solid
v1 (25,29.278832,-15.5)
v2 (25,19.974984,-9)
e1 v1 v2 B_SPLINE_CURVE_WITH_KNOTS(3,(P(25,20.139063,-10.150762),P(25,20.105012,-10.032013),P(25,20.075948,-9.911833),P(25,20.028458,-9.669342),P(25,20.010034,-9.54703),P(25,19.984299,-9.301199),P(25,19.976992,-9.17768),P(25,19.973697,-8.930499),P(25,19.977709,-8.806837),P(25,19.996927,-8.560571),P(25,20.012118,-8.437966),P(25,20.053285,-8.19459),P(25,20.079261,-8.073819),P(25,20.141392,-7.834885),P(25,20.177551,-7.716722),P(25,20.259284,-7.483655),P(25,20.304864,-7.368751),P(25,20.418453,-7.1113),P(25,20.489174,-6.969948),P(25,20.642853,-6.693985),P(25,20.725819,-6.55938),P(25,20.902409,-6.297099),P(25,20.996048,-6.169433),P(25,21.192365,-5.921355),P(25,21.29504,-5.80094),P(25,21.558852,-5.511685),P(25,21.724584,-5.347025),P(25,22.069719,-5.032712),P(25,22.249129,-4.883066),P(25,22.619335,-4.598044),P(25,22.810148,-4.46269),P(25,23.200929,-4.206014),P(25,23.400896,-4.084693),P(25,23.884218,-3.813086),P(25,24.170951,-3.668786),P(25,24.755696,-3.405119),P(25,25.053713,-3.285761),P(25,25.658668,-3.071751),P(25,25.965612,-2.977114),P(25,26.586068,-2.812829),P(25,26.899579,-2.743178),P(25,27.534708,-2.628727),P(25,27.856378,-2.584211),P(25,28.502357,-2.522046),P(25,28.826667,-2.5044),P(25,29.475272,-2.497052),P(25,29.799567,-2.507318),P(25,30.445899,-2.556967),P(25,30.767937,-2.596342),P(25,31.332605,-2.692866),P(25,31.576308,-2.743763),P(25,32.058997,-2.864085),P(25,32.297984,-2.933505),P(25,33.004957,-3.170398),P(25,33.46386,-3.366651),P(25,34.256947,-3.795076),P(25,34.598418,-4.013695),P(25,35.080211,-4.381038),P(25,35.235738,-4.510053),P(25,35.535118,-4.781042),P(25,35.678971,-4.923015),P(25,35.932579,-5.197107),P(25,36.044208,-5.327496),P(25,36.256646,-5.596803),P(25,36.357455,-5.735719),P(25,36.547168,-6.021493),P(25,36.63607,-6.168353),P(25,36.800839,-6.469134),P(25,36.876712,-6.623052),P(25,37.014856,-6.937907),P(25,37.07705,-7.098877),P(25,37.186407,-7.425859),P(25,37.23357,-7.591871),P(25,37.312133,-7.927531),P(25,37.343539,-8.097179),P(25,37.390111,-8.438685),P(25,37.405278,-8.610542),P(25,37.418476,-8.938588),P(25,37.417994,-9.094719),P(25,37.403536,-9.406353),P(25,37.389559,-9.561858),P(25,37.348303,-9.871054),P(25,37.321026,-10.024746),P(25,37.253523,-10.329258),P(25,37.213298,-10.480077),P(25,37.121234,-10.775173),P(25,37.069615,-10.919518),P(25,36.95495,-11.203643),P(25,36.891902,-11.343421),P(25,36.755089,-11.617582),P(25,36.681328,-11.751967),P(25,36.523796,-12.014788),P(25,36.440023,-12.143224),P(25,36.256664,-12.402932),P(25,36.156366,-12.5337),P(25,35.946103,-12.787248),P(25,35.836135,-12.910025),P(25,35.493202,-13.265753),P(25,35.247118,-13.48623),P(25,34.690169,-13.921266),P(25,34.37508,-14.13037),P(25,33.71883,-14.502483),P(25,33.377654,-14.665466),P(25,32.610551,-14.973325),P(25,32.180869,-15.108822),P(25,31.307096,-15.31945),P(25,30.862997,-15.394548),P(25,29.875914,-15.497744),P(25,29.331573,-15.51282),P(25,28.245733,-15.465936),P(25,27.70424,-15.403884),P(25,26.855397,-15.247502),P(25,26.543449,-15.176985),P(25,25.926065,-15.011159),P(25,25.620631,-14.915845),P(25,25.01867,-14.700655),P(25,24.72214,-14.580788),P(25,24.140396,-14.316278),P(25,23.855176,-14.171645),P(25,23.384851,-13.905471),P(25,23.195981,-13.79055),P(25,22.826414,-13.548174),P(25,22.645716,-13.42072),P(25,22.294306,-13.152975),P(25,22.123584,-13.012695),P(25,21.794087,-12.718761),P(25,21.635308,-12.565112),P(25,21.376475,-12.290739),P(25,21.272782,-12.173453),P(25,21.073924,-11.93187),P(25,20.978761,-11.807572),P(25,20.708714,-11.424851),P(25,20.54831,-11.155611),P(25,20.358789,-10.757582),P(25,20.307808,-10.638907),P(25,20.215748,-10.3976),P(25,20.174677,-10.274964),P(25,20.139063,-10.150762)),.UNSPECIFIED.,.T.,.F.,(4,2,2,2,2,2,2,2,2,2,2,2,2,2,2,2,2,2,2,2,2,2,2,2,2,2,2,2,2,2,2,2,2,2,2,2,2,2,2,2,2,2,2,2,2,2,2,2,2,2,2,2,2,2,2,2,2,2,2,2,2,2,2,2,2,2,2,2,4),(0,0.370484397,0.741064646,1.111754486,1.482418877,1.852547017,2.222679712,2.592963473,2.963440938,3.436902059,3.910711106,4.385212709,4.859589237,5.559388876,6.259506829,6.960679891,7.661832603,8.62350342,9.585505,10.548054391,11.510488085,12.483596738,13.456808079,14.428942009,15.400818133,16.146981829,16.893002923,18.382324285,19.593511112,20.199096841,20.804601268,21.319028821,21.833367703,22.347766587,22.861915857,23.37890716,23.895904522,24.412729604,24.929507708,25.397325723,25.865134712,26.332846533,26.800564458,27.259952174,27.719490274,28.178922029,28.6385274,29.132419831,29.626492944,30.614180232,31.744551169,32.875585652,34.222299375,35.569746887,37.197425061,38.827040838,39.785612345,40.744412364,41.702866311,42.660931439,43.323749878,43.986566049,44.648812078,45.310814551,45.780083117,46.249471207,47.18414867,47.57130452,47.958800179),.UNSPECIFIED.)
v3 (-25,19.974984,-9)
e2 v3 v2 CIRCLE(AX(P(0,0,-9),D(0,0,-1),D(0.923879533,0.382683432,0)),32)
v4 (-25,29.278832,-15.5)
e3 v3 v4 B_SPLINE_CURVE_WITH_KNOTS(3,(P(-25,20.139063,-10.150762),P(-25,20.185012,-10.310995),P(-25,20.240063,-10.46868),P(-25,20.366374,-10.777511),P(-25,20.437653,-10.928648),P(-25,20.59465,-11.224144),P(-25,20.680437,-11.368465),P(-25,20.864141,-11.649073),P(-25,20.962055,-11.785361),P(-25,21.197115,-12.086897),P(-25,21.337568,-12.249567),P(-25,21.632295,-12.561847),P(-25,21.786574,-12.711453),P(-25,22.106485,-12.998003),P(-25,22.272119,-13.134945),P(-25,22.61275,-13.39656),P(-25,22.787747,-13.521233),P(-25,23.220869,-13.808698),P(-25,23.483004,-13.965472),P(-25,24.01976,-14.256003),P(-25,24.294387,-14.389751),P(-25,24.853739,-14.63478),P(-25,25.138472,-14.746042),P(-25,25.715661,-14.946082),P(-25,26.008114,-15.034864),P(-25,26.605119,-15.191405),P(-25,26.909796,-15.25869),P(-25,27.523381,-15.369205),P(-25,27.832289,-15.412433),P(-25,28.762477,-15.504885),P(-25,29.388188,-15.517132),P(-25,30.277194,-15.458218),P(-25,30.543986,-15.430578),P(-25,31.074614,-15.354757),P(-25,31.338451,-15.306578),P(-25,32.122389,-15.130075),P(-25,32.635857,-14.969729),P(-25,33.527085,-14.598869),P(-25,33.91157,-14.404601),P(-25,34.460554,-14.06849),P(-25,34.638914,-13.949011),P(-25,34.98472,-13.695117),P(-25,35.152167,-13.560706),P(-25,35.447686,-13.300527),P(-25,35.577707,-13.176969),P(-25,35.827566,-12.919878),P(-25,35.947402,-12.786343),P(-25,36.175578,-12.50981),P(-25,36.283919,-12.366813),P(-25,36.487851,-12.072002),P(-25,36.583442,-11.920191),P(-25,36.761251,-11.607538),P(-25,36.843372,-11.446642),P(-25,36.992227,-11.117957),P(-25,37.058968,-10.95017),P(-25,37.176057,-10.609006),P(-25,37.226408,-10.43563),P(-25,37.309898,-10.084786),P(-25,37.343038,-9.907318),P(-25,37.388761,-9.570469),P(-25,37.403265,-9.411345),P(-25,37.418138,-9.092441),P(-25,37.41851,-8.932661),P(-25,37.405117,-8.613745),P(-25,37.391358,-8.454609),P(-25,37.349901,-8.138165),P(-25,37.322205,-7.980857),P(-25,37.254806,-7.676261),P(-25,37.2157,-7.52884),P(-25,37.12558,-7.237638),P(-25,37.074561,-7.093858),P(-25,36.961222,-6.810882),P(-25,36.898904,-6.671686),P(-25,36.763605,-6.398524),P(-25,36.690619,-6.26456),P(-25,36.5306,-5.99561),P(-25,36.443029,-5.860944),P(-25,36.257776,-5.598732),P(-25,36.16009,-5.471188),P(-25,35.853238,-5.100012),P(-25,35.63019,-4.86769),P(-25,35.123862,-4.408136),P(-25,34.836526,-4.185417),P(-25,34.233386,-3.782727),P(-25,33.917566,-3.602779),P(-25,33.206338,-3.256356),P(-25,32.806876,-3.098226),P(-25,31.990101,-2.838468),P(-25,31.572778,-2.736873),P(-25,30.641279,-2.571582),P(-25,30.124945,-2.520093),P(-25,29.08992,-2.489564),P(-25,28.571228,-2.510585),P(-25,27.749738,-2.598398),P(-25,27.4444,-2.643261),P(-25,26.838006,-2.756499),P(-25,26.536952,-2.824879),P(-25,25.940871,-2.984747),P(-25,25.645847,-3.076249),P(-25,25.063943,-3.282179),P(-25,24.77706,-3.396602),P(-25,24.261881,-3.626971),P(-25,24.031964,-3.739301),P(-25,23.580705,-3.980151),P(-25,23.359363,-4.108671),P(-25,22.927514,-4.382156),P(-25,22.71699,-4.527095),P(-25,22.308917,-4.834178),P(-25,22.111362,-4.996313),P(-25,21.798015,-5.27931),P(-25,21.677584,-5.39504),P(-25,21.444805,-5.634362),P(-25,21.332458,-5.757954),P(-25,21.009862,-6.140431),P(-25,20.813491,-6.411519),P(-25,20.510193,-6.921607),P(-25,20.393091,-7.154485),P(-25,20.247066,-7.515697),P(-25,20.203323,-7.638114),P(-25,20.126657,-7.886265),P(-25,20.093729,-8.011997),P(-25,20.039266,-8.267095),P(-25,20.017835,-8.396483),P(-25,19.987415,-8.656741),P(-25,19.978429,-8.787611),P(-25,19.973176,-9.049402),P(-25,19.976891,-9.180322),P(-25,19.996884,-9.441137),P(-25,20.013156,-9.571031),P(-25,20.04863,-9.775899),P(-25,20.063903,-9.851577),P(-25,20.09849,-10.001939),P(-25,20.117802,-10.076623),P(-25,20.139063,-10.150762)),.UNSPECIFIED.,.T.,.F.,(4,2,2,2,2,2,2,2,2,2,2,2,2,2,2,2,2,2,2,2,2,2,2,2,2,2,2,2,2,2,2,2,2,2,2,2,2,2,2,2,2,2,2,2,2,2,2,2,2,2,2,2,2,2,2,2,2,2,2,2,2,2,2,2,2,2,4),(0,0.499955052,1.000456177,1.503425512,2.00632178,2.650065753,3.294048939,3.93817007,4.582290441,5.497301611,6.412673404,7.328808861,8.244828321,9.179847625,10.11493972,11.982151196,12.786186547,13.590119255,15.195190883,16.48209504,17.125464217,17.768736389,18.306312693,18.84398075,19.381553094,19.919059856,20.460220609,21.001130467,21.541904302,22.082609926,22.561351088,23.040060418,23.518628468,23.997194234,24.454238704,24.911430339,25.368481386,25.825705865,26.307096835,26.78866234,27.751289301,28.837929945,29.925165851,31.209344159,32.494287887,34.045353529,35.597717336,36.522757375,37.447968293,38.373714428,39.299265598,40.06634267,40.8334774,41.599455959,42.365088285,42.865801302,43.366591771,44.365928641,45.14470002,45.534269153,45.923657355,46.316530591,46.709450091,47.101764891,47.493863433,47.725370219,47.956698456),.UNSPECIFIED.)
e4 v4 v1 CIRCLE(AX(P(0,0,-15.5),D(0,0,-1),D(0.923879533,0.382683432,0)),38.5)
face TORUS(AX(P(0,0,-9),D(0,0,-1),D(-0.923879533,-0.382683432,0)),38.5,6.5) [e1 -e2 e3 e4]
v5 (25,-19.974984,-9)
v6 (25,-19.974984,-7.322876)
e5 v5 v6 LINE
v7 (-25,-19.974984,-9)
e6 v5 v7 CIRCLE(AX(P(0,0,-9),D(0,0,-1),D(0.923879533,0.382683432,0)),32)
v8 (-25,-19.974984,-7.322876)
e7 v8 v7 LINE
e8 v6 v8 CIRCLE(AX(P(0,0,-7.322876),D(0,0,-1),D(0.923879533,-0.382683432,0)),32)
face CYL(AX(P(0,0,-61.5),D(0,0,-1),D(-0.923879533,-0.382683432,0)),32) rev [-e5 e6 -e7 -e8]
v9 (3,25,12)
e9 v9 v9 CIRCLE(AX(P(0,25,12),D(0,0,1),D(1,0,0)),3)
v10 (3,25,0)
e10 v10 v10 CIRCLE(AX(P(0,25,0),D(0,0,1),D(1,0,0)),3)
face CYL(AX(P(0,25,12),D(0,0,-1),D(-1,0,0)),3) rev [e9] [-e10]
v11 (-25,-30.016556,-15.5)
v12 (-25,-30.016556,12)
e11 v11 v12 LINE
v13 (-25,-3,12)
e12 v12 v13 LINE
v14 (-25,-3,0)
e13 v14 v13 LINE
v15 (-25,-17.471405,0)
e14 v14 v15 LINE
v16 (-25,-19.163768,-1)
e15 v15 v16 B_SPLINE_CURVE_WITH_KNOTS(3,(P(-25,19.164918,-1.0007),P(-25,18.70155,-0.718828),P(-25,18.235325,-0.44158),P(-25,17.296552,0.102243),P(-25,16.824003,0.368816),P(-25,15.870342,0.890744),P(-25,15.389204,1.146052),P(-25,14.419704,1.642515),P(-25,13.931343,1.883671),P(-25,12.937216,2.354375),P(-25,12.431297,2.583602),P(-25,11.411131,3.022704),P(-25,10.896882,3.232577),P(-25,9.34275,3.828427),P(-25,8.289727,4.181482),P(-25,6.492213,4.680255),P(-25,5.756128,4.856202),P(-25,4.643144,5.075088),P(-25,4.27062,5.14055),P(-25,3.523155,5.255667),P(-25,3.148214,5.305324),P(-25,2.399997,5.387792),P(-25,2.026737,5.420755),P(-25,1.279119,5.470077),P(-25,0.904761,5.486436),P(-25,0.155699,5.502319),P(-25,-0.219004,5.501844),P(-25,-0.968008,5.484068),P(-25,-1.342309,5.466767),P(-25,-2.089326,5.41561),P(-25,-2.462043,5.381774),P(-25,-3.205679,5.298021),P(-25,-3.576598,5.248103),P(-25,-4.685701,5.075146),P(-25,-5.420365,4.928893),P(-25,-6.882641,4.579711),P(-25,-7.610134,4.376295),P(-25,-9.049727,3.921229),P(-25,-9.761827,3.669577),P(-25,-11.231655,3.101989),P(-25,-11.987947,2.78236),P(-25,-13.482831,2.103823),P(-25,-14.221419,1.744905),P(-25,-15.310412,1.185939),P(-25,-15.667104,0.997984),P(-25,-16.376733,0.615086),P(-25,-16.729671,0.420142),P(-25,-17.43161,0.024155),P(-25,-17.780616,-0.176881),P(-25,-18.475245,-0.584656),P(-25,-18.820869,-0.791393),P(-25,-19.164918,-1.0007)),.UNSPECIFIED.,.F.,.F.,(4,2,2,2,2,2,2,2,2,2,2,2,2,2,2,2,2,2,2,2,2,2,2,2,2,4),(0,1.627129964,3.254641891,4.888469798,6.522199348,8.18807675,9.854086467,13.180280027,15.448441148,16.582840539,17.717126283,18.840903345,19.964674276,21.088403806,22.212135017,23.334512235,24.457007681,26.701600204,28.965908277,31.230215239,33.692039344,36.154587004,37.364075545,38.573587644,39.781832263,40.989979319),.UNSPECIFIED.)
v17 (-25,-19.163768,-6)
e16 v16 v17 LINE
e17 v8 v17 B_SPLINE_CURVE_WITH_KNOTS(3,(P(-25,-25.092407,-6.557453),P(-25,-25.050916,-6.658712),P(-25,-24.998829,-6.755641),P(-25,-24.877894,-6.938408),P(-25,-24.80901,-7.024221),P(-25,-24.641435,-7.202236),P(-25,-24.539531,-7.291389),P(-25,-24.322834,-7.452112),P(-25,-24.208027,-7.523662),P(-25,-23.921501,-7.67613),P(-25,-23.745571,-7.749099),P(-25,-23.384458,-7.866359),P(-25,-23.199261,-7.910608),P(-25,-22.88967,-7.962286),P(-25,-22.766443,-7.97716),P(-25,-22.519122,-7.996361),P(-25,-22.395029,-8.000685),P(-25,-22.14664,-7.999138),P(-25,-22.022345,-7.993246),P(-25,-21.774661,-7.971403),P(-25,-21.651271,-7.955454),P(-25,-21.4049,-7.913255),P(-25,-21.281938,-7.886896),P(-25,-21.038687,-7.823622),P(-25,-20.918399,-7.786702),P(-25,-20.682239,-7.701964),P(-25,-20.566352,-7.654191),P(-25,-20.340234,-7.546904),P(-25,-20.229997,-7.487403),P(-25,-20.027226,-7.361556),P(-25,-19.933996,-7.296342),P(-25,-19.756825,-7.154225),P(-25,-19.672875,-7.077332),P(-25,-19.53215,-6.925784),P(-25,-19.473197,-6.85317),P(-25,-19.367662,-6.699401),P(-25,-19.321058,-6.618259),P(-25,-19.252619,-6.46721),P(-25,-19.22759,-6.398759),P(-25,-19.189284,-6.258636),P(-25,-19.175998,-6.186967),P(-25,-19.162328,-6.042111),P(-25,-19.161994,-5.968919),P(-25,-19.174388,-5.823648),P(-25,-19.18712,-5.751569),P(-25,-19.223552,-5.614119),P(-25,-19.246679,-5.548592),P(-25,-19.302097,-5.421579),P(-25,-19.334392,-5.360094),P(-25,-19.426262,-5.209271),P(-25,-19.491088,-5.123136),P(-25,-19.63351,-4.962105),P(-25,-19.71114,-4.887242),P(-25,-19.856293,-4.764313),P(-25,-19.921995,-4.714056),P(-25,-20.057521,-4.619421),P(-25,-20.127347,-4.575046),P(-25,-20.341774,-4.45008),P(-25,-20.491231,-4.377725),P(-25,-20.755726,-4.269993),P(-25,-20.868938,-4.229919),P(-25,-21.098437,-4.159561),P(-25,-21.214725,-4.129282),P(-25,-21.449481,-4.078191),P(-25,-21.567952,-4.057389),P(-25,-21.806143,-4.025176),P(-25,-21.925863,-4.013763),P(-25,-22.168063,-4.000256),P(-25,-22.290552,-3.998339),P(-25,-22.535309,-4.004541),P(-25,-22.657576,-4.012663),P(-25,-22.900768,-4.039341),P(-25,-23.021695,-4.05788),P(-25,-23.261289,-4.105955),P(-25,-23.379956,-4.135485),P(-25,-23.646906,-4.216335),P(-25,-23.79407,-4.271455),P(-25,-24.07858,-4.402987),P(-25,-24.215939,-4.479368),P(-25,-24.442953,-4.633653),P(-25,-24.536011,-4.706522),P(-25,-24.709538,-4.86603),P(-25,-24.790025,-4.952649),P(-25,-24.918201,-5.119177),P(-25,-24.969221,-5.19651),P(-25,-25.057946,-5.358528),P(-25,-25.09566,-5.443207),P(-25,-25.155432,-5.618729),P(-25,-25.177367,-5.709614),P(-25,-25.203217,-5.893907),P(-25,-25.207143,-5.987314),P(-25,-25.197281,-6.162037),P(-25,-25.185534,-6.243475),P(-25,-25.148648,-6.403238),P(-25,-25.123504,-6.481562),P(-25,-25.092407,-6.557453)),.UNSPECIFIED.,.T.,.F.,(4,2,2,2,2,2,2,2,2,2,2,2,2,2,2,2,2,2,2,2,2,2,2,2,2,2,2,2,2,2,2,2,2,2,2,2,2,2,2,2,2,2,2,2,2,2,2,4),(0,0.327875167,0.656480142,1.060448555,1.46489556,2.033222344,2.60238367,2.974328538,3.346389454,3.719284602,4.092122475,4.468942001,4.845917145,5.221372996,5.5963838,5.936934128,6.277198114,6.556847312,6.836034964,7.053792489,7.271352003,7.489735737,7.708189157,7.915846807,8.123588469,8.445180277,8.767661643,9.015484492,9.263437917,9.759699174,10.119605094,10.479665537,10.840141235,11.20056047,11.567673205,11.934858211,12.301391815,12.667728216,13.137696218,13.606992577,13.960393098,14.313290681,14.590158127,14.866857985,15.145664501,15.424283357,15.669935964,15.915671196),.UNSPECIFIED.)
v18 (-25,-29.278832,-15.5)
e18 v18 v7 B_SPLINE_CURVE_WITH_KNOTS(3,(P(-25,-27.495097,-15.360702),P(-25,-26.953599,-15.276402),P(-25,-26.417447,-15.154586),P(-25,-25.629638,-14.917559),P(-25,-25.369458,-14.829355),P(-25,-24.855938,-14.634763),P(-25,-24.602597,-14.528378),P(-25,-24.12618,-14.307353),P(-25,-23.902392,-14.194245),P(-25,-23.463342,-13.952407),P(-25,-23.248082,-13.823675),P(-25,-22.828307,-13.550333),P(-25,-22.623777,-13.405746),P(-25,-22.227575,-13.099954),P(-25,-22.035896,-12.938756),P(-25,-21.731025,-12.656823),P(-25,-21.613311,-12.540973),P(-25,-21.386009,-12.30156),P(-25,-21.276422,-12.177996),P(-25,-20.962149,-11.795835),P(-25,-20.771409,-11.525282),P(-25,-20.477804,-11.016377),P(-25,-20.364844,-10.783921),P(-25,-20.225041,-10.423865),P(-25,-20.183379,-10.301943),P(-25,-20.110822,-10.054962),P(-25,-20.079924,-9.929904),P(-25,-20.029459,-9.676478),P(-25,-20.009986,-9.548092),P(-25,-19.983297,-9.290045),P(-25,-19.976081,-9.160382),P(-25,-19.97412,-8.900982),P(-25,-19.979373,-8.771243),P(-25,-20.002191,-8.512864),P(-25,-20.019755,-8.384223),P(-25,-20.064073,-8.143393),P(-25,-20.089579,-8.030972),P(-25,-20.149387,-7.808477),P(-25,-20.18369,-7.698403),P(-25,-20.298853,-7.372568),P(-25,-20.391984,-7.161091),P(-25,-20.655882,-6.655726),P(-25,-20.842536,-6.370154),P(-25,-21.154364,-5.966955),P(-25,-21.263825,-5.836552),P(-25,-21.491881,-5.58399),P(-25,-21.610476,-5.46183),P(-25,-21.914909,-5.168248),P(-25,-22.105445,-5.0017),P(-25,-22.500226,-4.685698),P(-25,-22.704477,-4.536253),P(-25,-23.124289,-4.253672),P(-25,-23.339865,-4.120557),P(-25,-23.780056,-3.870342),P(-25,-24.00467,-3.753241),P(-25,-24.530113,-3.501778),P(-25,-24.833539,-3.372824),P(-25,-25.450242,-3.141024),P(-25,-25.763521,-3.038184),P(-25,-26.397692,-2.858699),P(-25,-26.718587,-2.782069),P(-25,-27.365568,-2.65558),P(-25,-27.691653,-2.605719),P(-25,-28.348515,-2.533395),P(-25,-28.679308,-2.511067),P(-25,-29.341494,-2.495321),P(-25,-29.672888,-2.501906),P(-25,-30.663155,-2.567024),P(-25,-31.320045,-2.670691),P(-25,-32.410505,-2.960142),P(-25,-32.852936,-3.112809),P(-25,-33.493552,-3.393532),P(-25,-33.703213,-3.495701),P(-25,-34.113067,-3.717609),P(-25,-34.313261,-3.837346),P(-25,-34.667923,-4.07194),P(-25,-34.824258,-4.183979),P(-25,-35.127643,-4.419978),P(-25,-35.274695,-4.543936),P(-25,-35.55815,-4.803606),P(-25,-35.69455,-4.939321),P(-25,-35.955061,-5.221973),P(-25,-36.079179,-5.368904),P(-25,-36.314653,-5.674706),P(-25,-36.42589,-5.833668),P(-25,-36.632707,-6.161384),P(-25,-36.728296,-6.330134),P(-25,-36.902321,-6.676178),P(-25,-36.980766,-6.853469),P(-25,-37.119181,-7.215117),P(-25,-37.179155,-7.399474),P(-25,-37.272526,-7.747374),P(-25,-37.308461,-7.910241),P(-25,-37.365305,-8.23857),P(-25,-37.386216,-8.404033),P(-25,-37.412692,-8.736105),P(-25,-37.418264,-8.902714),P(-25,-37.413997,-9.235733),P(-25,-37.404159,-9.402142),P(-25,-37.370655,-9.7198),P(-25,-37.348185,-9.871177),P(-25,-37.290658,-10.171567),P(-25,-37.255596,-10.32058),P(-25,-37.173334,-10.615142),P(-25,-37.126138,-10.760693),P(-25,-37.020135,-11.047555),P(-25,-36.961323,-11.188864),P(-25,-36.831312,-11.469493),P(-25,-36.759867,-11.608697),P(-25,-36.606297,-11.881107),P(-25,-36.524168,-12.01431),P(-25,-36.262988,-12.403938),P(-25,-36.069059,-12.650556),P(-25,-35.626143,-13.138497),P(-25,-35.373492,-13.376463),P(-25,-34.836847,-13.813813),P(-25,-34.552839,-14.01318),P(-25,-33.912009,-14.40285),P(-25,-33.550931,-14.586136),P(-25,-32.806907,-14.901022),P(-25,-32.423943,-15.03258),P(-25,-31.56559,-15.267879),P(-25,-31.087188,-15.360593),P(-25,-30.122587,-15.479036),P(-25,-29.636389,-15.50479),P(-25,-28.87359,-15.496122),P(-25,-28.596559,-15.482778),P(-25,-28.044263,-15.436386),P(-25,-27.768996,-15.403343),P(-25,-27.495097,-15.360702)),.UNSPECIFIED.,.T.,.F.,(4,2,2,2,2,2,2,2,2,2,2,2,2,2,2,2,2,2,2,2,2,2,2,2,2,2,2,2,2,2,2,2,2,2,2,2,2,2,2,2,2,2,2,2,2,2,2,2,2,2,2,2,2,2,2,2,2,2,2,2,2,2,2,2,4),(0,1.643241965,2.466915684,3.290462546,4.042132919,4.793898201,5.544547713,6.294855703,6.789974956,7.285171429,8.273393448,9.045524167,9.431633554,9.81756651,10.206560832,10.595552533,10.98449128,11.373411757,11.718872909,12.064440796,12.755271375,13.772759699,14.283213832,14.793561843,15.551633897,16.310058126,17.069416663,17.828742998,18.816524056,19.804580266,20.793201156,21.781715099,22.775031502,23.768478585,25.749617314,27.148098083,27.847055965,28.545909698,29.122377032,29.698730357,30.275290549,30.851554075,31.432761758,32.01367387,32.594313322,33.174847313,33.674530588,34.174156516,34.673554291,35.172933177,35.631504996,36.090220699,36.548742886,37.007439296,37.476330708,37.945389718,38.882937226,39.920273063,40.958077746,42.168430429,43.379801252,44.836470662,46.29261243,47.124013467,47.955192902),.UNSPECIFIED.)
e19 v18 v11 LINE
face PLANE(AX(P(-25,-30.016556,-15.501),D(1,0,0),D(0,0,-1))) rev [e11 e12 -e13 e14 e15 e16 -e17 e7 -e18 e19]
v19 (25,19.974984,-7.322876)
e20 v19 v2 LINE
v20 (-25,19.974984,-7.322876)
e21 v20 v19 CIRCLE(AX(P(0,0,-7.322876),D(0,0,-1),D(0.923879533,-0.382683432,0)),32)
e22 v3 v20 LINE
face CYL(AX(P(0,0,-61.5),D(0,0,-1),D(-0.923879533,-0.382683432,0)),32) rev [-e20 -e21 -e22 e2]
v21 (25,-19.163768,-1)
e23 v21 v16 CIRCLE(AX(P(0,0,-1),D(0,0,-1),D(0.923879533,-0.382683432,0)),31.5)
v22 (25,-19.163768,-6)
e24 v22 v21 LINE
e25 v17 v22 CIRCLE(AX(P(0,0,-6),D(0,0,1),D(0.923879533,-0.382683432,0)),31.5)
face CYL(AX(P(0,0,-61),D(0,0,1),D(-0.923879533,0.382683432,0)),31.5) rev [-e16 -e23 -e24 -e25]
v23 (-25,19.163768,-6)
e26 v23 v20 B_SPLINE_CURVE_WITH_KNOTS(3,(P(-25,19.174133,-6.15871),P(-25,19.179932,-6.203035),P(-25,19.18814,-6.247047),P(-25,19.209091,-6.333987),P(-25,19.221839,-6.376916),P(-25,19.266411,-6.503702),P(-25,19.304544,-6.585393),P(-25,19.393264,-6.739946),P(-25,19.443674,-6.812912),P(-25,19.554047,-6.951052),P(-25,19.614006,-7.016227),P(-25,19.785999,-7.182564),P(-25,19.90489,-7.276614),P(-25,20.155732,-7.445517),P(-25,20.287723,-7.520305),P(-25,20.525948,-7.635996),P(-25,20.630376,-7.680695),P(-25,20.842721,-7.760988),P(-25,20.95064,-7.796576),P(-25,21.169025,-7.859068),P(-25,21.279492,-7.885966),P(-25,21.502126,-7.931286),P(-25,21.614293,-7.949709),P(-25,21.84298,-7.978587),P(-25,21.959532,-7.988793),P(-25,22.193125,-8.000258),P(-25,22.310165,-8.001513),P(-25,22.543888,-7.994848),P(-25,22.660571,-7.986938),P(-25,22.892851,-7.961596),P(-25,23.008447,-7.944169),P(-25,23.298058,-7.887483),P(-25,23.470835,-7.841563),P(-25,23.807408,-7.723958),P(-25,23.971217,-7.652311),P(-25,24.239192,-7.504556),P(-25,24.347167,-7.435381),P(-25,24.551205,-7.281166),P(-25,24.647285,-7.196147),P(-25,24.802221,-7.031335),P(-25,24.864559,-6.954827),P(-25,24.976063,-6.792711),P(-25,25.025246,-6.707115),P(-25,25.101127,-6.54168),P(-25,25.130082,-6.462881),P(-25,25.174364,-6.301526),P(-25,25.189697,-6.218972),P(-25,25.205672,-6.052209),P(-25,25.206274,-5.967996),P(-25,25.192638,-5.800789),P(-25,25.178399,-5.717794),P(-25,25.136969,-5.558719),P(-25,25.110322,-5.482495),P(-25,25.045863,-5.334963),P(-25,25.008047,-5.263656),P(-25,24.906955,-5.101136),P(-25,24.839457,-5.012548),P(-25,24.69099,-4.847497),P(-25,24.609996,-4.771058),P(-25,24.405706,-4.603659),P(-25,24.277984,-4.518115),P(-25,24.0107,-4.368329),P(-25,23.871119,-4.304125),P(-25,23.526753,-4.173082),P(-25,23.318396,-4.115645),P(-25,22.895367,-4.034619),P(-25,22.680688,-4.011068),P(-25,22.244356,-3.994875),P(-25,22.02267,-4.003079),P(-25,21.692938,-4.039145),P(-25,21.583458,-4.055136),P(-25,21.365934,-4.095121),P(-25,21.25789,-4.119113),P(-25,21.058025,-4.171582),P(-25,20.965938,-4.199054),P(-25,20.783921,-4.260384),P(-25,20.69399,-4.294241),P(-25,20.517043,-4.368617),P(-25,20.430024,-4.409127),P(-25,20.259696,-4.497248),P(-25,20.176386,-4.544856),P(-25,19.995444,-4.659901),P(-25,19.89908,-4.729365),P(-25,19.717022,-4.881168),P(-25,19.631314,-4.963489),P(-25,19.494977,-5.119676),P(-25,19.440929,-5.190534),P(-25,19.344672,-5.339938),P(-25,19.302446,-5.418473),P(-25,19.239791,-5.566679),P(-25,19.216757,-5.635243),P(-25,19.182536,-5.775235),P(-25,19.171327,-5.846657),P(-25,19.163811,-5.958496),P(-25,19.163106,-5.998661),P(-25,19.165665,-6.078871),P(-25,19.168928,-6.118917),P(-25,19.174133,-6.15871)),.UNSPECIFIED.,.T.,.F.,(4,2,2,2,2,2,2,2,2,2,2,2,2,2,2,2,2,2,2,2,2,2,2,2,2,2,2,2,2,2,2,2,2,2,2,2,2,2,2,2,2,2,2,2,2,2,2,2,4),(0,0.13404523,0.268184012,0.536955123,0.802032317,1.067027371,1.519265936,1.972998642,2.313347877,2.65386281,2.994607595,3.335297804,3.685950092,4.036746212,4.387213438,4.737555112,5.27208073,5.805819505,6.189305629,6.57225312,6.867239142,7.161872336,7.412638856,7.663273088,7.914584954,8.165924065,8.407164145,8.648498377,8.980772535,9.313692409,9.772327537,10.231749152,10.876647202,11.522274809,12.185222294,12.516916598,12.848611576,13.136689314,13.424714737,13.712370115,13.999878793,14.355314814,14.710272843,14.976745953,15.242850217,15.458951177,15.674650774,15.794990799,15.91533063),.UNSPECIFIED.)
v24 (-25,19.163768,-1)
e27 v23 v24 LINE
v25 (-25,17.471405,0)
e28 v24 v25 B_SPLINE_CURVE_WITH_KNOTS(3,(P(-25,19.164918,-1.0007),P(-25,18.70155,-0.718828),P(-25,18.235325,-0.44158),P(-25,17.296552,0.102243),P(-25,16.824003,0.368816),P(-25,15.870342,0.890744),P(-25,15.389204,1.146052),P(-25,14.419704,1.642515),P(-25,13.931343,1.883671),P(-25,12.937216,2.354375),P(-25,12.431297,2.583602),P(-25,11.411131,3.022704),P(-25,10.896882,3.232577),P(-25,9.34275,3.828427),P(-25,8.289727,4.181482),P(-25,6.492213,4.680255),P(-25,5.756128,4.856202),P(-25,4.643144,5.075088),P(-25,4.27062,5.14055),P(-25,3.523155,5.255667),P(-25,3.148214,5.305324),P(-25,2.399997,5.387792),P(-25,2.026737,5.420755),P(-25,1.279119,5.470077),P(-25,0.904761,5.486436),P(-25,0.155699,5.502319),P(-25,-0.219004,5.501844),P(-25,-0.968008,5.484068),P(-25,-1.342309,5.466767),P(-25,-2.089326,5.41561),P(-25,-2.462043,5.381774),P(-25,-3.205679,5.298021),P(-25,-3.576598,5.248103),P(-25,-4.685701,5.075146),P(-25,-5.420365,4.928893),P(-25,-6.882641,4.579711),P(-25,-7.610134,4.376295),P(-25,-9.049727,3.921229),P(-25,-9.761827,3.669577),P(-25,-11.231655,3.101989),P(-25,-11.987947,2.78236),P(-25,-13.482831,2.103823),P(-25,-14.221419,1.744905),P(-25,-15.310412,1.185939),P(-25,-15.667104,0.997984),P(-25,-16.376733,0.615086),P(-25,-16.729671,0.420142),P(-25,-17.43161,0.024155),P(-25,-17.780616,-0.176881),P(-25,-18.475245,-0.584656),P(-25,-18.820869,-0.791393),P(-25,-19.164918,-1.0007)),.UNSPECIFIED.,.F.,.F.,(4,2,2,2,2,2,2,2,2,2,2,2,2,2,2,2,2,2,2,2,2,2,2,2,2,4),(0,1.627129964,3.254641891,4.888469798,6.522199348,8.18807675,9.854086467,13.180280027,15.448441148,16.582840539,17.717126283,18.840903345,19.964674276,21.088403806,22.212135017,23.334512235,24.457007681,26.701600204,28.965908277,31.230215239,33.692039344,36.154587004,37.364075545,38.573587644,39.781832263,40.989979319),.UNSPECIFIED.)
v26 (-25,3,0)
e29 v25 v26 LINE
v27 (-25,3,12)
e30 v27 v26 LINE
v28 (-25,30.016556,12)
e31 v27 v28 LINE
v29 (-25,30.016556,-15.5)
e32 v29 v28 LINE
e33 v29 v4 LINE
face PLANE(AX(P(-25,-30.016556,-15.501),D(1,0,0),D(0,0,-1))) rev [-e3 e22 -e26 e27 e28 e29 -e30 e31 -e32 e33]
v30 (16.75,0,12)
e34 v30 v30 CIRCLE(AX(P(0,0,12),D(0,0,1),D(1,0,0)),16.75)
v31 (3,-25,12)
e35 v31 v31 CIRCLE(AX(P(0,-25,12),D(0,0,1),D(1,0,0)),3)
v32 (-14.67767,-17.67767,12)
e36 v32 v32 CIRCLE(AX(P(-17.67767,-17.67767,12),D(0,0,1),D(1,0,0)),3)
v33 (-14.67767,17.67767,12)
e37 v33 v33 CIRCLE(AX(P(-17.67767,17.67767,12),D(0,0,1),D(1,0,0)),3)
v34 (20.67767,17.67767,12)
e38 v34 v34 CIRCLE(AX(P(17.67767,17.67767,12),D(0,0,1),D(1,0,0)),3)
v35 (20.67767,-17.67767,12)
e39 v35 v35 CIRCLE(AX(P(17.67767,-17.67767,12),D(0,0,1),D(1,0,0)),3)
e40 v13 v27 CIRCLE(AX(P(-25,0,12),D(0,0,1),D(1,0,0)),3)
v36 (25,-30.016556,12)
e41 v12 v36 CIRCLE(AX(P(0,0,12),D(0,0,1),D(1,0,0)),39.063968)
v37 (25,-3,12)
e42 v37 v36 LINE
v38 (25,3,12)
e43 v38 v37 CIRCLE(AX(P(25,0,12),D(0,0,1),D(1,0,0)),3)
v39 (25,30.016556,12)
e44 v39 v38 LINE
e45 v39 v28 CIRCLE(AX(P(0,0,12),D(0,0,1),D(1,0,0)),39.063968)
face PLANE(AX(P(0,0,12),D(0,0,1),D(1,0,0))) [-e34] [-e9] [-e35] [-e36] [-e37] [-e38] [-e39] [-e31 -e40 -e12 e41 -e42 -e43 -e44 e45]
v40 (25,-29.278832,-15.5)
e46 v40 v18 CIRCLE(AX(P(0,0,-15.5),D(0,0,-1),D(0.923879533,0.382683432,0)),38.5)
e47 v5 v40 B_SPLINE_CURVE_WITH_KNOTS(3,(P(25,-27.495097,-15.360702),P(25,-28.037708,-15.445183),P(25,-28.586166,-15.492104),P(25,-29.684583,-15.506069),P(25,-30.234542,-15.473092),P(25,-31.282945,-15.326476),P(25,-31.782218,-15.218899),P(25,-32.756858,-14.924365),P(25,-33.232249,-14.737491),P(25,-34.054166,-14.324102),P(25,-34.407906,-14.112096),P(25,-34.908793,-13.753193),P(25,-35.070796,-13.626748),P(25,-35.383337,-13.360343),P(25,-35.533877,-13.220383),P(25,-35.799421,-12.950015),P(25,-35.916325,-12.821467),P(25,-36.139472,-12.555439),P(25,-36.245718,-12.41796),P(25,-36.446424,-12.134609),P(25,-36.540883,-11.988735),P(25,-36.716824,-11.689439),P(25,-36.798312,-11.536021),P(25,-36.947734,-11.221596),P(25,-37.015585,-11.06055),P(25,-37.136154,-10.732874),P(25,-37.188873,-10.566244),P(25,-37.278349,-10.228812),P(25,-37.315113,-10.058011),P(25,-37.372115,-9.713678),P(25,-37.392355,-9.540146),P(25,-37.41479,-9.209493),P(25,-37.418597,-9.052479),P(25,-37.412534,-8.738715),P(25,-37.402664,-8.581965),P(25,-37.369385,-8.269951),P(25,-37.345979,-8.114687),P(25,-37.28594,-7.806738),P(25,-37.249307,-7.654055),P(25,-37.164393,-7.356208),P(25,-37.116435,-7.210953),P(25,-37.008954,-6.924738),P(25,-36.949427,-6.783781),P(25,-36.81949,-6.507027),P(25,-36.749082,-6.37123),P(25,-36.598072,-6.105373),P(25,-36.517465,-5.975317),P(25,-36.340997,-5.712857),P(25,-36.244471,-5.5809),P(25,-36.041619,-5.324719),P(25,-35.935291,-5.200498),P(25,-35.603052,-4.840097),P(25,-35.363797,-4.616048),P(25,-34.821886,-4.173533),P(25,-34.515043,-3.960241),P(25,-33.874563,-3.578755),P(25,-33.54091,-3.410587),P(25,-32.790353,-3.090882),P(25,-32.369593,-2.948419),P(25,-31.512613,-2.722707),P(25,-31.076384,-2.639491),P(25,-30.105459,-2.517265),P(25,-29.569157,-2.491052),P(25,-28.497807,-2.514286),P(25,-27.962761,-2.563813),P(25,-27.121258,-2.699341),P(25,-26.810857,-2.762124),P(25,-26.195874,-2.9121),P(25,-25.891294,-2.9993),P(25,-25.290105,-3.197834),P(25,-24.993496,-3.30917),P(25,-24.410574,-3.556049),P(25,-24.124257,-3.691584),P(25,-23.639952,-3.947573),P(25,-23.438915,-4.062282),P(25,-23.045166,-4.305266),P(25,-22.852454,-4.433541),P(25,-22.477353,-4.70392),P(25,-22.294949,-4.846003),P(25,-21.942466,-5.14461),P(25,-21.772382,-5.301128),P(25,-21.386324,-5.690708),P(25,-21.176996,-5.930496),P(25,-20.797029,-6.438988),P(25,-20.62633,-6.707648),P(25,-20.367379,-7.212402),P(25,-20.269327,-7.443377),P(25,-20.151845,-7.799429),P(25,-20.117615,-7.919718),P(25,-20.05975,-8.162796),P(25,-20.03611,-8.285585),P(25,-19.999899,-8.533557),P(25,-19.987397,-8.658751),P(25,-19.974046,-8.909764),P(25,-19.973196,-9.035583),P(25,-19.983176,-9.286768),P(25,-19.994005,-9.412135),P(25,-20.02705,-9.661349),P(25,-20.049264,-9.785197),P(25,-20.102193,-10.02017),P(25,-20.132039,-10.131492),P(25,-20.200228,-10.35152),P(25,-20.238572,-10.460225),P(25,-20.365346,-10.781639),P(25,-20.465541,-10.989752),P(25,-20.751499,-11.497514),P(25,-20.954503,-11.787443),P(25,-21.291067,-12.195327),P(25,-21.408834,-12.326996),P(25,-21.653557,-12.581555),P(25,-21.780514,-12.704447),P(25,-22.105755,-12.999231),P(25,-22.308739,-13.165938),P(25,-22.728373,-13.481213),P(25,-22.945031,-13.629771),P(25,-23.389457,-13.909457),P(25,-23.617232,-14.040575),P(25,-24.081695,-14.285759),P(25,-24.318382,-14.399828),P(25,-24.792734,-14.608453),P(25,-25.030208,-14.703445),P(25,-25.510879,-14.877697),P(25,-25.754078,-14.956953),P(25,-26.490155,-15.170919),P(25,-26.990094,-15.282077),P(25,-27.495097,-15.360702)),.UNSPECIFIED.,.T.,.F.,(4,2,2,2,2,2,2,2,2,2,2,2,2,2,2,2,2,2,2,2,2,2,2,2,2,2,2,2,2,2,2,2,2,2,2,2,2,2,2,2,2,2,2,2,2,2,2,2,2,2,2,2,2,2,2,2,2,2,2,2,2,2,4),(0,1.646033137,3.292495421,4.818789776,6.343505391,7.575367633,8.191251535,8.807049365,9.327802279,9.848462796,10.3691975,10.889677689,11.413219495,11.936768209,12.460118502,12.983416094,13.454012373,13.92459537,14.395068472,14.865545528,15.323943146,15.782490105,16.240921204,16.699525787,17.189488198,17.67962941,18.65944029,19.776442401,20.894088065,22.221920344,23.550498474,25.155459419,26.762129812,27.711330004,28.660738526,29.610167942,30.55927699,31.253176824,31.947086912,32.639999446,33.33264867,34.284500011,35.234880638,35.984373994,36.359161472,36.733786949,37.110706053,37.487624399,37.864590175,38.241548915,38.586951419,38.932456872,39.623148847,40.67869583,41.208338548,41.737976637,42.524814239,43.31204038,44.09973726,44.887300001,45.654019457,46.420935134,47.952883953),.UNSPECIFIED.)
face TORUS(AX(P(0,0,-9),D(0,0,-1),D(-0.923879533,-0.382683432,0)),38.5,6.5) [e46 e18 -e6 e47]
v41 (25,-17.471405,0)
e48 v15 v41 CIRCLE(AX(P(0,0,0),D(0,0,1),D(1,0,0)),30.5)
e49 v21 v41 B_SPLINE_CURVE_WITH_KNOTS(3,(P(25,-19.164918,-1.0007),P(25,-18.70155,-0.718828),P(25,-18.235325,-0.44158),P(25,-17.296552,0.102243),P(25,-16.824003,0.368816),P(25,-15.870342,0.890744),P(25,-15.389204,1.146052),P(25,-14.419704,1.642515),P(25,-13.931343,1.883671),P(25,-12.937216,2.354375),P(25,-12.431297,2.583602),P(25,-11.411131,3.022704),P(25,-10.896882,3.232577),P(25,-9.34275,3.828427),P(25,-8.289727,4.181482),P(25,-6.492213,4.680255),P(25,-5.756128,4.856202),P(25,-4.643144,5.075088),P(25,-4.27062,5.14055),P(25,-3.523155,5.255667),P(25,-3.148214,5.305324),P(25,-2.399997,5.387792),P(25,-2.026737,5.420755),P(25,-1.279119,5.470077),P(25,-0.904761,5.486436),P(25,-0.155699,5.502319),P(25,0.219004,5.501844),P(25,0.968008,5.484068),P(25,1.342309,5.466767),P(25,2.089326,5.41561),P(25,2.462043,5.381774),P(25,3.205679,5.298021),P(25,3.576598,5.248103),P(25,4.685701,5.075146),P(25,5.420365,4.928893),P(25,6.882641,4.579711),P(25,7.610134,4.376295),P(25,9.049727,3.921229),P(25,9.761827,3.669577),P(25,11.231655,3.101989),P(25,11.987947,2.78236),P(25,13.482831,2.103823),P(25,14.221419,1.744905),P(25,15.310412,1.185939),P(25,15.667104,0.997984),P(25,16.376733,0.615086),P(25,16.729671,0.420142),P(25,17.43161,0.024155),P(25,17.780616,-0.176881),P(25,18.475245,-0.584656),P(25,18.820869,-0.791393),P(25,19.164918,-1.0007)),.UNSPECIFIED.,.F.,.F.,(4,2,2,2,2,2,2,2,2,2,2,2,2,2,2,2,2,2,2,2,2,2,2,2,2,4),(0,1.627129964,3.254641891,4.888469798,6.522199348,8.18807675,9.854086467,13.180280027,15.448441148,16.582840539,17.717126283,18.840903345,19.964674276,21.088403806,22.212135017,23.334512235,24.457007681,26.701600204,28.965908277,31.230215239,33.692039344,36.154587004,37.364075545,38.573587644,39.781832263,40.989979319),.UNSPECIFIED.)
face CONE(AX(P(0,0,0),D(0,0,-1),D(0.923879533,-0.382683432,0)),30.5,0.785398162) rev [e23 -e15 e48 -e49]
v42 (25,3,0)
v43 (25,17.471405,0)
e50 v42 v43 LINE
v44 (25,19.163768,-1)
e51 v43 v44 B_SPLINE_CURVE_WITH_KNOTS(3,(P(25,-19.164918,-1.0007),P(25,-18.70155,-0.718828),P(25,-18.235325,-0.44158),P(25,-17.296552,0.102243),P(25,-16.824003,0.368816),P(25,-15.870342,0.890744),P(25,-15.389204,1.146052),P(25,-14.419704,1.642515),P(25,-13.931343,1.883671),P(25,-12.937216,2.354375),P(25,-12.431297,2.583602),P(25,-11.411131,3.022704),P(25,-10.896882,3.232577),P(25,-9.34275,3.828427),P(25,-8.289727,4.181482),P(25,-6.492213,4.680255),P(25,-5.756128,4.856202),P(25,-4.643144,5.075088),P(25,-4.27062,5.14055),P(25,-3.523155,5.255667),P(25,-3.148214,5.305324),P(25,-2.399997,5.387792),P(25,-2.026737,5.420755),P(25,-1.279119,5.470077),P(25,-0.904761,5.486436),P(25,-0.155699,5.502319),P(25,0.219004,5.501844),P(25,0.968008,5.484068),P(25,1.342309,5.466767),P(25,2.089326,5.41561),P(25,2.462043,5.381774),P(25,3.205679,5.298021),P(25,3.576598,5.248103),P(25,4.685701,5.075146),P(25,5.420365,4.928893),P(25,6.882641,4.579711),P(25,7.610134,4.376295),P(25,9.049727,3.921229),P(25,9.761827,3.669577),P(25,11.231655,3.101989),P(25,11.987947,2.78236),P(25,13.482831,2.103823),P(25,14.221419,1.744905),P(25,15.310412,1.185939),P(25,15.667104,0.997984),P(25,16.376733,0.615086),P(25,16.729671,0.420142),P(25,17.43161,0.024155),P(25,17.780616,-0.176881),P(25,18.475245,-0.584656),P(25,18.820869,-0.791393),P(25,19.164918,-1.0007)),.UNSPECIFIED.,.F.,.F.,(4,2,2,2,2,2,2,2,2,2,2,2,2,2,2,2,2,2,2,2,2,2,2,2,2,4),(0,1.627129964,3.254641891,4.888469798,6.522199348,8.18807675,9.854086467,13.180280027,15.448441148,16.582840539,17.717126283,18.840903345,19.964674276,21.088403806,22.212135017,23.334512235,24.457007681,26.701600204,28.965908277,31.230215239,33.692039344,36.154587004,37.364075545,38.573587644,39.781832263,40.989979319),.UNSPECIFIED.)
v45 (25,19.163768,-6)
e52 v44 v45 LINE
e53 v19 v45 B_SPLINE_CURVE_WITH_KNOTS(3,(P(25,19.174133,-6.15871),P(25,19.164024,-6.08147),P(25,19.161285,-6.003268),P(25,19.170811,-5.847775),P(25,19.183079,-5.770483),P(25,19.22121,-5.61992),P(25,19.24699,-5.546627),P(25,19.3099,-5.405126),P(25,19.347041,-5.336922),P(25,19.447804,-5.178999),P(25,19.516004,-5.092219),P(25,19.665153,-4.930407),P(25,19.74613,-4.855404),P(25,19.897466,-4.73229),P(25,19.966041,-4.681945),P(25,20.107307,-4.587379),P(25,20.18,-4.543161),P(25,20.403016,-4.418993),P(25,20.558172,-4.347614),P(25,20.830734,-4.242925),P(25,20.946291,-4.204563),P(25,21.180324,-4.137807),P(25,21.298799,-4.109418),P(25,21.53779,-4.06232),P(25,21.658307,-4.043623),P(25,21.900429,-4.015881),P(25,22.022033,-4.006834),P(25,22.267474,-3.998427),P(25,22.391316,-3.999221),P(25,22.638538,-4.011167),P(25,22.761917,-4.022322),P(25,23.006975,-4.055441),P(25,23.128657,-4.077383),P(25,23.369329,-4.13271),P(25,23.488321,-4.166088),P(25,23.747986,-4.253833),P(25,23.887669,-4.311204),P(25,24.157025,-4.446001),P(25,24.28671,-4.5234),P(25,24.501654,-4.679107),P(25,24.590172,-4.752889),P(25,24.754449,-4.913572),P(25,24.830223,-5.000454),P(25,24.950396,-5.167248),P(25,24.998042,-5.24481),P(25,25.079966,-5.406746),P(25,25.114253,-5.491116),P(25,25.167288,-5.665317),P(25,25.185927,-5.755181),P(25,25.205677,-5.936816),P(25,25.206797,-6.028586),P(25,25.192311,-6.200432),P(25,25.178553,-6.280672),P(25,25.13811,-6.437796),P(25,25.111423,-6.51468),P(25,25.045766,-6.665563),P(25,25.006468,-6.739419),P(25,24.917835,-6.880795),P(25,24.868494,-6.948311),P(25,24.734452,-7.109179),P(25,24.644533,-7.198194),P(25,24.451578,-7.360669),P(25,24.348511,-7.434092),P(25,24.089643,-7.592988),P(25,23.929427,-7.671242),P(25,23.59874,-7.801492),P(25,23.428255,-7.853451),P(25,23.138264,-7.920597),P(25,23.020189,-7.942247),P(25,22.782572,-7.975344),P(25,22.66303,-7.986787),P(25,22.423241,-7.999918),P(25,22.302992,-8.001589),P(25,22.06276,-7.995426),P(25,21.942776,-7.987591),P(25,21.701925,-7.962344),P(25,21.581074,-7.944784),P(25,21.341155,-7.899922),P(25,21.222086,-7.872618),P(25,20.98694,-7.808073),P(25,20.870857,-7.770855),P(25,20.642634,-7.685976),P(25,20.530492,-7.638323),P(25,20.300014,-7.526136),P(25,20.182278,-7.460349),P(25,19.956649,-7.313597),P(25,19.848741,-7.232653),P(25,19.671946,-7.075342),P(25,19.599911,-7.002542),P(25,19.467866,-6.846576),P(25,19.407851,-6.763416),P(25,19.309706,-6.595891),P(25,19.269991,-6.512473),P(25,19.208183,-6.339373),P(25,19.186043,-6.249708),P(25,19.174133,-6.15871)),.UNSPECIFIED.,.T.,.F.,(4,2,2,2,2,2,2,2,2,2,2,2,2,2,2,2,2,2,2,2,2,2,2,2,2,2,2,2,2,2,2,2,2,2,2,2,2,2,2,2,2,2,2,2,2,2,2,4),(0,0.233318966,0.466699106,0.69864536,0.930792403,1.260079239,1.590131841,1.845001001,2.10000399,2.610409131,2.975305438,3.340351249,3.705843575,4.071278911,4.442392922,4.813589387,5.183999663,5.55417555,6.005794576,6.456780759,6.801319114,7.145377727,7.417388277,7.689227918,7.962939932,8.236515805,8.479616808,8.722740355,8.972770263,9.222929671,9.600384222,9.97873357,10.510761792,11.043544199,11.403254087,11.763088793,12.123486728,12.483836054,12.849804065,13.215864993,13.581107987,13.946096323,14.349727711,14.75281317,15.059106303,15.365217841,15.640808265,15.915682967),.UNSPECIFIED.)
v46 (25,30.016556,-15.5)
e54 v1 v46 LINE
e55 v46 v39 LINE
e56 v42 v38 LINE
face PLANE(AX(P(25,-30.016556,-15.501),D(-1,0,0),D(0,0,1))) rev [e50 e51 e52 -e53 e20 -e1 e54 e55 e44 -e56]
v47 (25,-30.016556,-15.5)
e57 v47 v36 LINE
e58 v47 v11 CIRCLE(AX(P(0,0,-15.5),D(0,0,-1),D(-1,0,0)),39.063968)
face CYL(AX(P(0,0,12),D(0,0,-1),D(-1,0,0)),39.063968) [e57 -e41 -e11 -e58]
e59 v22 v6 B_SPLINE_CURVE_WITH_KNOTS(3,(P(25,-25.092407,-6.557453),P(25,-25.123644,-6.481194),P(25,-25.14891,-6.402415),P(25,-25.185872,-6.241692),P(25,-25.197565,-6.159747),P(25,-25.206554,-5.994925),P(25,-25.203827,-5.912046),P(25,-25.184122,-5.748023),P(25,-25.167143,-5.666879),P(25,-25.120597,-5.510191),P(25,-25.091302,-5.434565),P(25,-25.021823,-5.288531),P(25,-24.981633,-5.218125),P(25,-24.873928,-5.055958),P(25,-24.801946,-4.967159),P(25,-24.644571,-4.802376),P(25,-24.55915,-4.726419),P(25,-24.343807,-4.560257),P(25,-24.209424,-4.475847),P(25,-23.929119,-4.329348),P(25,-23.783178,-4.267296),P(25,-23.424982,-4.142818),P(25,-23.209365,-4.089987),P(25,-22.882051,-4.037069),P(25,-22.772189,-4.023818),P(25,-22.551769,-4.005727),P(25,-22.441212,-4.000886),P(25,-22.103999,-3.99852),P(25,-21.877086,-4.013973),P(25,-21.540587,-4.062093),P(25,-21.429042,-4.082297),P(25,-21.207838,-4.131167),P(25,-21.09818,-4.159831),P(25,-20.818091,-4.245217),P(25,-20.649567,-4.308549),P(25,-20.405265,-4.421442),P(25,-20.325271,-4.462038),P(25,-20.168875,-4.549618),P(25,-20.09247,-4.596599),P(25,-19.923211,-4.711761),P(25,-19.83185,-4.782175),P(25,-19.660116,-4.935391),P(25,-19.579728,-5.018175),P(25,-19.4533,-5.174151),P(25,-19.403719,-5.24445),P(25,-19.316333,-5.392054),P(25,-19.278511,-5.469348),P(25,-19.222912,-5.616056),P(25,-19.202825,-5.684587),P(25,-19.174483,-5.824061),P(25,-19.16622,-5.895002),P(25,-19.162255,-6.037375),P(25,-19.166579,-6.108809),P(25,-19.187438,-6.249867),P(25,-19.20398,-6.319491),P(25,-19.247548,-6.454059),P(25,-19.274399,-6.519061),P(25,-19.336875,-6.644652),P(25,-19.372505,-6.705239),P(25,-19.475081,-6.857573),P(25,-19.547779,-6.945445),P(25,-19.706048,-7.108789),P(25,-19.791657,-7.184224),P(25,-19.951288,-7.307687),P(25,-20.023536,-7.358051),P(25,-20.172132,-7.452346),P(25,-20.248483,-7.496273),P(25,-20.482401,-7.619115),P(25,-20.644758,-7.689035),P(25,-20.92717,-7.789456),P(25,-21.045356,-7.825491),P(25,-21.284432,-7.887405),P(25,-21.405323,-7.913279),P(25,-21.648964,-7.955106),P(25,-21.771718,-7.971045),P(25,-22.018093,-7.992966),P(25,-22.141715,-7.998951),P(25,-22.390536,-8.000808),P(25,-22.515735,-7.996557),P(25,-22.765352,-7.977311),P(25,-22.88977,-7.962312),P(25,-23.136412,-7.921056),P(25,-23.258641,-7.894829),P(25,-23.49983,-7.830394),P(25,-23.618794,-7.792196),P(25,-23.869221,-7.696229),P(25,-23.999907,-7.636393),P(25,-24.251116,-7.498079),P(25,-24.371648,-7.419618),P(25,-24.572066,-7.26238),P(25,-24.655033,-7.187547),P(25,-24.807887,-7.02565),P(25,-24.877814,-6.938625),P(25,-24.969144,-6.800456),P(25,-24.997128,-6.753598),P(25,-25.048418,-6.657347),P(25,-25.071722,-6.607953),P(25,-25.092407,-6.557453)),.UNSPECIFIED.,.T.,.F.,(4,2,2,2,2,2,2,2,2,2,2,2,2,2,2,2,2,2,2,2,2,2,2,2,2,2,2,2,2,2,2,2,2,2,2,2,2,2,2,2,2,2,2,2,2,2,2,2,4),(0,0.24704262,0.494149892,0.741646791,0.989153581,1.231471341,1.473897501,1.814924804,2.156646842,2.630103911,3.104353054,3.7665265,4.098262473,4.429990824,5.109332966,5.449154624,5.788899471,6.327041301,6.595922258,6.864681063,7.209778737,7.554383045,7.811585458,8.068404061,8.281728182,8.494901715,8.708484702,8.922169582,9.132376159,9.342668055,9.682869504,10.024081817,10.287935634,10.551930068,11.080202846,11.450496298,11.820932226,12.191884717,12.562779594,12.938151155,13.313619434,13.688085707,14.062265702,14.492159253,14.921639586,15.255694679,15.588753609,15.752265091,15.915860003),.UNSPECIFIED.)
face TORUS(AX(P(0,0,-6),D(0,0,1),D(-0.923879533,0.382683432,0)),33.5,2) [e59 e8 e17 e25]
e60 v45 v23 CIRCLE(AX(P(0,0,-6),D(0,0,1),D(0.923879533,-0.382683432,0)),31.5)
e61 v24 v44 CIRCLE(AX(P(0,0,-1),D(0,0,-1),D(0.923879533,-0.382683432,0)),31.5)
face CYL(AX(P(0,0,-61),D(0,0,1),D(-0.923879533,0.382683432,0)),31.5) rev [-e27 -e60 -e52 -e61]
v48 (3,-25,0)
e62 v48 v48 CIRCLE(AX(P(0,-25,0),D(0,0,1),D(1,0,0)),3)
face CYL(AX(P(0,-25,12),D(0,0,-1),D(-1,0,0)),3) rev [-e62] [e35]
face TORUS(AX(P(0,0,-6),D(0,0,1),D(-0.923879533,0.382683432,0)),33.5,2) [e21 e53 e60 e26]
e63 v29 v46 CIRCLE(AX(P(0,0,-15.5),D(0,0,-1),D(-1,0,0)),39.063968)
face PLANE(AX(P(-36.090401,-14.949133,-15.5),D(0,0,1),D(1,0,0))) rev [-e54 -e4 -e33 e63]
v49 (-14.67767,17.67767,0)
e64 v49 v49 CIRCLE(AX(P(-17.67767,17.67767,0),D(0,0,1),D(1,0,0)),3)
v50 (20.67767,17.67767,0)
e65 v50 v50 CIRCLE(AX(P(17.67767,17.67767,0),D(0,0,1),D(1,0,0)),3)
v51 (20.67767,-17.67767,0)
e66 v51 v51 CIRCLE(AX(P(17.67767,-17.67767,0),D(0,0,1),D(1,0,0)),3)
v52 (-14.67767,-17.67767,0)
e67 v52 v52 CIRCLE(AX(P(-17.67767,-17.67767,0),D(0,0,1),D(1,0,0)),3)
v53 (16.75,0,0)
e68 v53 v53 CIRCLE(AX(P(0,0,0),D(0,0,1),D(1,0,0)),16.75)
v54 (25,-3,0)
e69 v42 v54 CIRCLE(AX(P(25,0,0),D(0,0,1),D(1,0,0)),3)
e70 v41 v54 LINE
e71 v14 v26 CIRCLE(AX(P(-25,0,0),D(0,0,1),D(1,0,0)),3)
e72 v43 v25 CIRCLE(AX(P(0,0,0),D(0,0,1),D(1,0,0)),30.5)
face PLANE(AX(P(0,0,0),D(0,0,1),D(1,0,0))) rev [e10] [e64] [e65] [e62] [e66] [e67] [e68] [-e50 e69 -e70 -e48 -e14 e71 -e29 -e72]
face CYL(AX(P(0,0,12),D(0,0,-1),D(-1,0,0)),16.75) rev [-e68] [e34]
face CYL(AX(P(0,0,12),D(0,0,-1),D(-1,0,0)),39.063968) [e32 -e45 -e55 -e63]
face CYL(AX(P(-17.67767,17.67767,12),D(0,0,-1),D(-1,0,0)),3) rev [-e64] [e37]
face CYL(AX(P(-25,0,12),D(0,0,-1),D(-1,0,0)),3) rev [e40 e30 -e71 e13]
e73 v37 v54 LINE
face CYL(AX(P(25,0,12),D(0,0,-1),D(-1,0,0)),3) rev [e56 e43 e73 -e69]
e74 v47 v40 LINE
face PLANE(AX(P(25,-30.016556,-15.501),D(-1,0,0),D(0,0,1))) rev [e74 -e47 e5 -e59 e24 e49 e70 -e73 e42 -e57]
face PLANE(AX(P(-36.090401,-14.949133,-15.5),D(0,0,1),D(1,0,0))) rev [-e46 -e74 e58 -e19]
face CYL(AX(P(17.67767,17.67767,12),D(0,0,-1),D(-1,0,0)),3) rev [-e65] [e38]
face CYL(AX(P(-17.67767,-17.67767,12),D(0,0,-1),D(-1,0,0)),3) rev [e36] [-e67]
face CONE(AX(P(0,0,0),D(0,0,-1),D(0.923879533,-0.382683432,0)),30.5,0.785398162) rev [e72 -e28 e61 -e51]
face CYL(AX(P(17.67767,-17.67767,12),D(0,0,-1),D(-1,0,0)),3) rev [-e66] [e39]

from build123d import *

# Parameters (mm, degrees)
BOSS_EXTRUDE1_OUTLINE_R     = 39.0639683
BOSS_EXTRUDE1_OUTLINE_R_2   = 3
BOSS_EXTRUDE1_OUTLINE_R_3   = 16.75
BOSS_EXTRUDE1_DEPTH         = 12
BOSS_EXTRUDE1_START         = -9.0000001
BOSS_EXTRUDE1_2_OUTLINE_R   = 39.0639683
BOSS_EXTRUDE1_2_OUTLINE_R_2 = 32
BOSS_EXTRUDE1_2_DEPTH       = 9.0000001
BOSS_EXTRUDE1_START_2       = -6.0000001
BOSS_EXTRUDE1_3_OUTLINE_R   = 32
BOSS_EXTRUDE1_3_OUTLINE_R_2 = 31.5
BOSS_EXTRUDE1_3_DEPTH       = 6.0000001
CUT_EXTRUDE1_REACH          = 63.711


with BuildPart() as part:
    # Boss-Extrude1: read off the stored shape, not the designer's step
    # Boss-Extrude1 outline → Boss-Extrude1 (new body)
    with BuildSketch(Plane.XY):
        Circle(BOSS_EXTRUDE1_OUTLINE_R)
        with Locations((0, 25)):
            Circle(BOSS_EXTRUDE1_OUTLINE_R_2, mode=Mode.SUBTRACT)
        with Locations((-17.67766953, -17.67766953)):
            Circle(BOSS_EXTRUDE1_OUTLINE_R_2, mode=Mode.SUBTRACT)
        with Locations((0, -25)):
            Circle(BOSS_EXTRUDE1_OUTLINE_R_2, mode=Mode.SUBTRACT)
        with Locations((17.67766953, -17.67766953)):
            Circle(BOSS_EXTRUDE1_OUTLINE_R_2, mode=Mode.SUBTRACT)
        with Locations((-25, 0)):
            Circle(BOSS_EXTRUDE1_OUTLINE_R_2, mode=Mode.SUBTRACT)
        with Locations((-17.67766953, 17.67766953)):
            Circle(BOSS_EXTRUDE1_OUTLINE_R_2, mode=Mode.SUBTRACT)
        Circle(BOSS_EXTRUDE1_OUTLINE_R_3, mode=Mode.SUBTRACT)
        with Locations((17.67766953, 17.67766953)):
            Circle(BOSS_EXTRUDE1_OUTLINE_R_2, mode=Mode.SUBTRACT)
        with Locations((25, 0)):
            Circle(BOSS_EXTRUDE1_OUTLINE_R_2, mode=Mode.SUBTRACT)
    extrude(amount=BOSS_EXTRUDE1_DEPTH)



with BuildPart() as body_2:
    # Boss-Extrude1 2 outline → Boss-Extrude1 2 (new body)
    with BuildSketch(Plane.XY.offset(BOSS_EXTRUDE1_START)):
        Circle(BOSS_EXTRUDE1_2_OUTLINE_R)
        Circle(BOSS_EXTRUDE1_2_OUTLINE_R_2, mode=Mode.SUBTRACT)
    extrude(amount=BOSS_EXTRUDE1_2_DEPTH)


with BuildPart() as body_3:
    # Boss-Extrude1 3 outline → Boss-Extrude1 3 (new body)
    with BuildSketch(Plane.XY.offset(BOSS_EXTRUDE1_START_2)):
        Circle(BOSS_EXTRUDE1_3_OUTLINE_R)
        Circle(BOSS_EXTRUDE1_3_OUTLINE_R_2, mode=Mode.SUBTRACT)
    extrude(amount=BOSS_EXTRUDE1_3_DEPTH)


with BuildPart() as part_1:
    add(part.part)

    add(body_2.part)  # Boss-Extrude1 4 merges body 2

    add(body_3.part)  # Boss-Extrude1 4 merges body 3
    # Boss-Extrude1 4 outline → Boss-Extrude1 4 (revolve)
    with BuildSketch(Plane.XZ):
        Polygon((31.499999999, -1.000000001), (31.499999999, 0), (30.5, 0), align=None)
        with BuildLine():
            Line((32, -7.322875656), (32, -6.0000001))
            Line((32, -6.0000001), (31.5, -6))
            ThreePointArc((31.5, -6), (31.629171307, -6.707106781), (32, -7.322875656))
        make_face()
        with BuildLine():
            Line((39.0639683, -15.5), (39.0639683, -9.0000001))
            Line((39.0639683, -9.0000001), (32, -9))
            ThreePointArc((32, -9), (33.903805922, -13.596194078), (38.5, -15.5))
            Line((38.5, -15.5), (39.0639683, -15.5))
        make_face()
    revolve(axis=Axis((0, 0, 0), (0, 0, 1)))

    # Sketch2 → Cut-Extrude1 (cut, up to next)
    with BuildSketch(Plane.XY.offset(12), mode=Mode.PRIVATE) as cut_extrude1_sk1:
        with BuildLine():
            Line((-25, -30.016555754), (-25, 30.016555754))
            ThreePointArc((-25, 30.016555754), (-39.0639683, 0), (-25, -30.016555754))
        make_face()
    cut_extrude1_tool1 = extrude(cut_extrude1_sk1.sketch, amount=-CUT_EXTRUDE1_REACH, mode=Mode.PRIVATE) & part_1.part
    # Sketch2 → Cut-Extrude1 (cut, up to next)
    with BuildSketch(Plane.XY.offset(12), mode=Mode.PRIVATE) as cut_extrude1_sk2:
        with BuildLine():
            Line((25, -30.016555754), (25, 30.016555754))
            ThreePointArc((25, 30.016555754), (39.0639683, 0), (25, -30.016555754))
        make_face()
    cut_extrude1_tool2 = extrude(cut_extrude1_sk2.sketch, amount=-CUT_EXTRUDE1_REACH, mode=Mode.PRIVATE) & part_1.part
    add(cut_extrude1_tool1.solids().sort_by_distance((-30.722563, 0, 12))[0], mode=Mode.SUBTRACT)
    add(cut_extrude1_tool2.solids().sort_by_distance((30.722563, 0, 12))[0], mode=Mode.SUBTRACT)


solid = part_1.part
